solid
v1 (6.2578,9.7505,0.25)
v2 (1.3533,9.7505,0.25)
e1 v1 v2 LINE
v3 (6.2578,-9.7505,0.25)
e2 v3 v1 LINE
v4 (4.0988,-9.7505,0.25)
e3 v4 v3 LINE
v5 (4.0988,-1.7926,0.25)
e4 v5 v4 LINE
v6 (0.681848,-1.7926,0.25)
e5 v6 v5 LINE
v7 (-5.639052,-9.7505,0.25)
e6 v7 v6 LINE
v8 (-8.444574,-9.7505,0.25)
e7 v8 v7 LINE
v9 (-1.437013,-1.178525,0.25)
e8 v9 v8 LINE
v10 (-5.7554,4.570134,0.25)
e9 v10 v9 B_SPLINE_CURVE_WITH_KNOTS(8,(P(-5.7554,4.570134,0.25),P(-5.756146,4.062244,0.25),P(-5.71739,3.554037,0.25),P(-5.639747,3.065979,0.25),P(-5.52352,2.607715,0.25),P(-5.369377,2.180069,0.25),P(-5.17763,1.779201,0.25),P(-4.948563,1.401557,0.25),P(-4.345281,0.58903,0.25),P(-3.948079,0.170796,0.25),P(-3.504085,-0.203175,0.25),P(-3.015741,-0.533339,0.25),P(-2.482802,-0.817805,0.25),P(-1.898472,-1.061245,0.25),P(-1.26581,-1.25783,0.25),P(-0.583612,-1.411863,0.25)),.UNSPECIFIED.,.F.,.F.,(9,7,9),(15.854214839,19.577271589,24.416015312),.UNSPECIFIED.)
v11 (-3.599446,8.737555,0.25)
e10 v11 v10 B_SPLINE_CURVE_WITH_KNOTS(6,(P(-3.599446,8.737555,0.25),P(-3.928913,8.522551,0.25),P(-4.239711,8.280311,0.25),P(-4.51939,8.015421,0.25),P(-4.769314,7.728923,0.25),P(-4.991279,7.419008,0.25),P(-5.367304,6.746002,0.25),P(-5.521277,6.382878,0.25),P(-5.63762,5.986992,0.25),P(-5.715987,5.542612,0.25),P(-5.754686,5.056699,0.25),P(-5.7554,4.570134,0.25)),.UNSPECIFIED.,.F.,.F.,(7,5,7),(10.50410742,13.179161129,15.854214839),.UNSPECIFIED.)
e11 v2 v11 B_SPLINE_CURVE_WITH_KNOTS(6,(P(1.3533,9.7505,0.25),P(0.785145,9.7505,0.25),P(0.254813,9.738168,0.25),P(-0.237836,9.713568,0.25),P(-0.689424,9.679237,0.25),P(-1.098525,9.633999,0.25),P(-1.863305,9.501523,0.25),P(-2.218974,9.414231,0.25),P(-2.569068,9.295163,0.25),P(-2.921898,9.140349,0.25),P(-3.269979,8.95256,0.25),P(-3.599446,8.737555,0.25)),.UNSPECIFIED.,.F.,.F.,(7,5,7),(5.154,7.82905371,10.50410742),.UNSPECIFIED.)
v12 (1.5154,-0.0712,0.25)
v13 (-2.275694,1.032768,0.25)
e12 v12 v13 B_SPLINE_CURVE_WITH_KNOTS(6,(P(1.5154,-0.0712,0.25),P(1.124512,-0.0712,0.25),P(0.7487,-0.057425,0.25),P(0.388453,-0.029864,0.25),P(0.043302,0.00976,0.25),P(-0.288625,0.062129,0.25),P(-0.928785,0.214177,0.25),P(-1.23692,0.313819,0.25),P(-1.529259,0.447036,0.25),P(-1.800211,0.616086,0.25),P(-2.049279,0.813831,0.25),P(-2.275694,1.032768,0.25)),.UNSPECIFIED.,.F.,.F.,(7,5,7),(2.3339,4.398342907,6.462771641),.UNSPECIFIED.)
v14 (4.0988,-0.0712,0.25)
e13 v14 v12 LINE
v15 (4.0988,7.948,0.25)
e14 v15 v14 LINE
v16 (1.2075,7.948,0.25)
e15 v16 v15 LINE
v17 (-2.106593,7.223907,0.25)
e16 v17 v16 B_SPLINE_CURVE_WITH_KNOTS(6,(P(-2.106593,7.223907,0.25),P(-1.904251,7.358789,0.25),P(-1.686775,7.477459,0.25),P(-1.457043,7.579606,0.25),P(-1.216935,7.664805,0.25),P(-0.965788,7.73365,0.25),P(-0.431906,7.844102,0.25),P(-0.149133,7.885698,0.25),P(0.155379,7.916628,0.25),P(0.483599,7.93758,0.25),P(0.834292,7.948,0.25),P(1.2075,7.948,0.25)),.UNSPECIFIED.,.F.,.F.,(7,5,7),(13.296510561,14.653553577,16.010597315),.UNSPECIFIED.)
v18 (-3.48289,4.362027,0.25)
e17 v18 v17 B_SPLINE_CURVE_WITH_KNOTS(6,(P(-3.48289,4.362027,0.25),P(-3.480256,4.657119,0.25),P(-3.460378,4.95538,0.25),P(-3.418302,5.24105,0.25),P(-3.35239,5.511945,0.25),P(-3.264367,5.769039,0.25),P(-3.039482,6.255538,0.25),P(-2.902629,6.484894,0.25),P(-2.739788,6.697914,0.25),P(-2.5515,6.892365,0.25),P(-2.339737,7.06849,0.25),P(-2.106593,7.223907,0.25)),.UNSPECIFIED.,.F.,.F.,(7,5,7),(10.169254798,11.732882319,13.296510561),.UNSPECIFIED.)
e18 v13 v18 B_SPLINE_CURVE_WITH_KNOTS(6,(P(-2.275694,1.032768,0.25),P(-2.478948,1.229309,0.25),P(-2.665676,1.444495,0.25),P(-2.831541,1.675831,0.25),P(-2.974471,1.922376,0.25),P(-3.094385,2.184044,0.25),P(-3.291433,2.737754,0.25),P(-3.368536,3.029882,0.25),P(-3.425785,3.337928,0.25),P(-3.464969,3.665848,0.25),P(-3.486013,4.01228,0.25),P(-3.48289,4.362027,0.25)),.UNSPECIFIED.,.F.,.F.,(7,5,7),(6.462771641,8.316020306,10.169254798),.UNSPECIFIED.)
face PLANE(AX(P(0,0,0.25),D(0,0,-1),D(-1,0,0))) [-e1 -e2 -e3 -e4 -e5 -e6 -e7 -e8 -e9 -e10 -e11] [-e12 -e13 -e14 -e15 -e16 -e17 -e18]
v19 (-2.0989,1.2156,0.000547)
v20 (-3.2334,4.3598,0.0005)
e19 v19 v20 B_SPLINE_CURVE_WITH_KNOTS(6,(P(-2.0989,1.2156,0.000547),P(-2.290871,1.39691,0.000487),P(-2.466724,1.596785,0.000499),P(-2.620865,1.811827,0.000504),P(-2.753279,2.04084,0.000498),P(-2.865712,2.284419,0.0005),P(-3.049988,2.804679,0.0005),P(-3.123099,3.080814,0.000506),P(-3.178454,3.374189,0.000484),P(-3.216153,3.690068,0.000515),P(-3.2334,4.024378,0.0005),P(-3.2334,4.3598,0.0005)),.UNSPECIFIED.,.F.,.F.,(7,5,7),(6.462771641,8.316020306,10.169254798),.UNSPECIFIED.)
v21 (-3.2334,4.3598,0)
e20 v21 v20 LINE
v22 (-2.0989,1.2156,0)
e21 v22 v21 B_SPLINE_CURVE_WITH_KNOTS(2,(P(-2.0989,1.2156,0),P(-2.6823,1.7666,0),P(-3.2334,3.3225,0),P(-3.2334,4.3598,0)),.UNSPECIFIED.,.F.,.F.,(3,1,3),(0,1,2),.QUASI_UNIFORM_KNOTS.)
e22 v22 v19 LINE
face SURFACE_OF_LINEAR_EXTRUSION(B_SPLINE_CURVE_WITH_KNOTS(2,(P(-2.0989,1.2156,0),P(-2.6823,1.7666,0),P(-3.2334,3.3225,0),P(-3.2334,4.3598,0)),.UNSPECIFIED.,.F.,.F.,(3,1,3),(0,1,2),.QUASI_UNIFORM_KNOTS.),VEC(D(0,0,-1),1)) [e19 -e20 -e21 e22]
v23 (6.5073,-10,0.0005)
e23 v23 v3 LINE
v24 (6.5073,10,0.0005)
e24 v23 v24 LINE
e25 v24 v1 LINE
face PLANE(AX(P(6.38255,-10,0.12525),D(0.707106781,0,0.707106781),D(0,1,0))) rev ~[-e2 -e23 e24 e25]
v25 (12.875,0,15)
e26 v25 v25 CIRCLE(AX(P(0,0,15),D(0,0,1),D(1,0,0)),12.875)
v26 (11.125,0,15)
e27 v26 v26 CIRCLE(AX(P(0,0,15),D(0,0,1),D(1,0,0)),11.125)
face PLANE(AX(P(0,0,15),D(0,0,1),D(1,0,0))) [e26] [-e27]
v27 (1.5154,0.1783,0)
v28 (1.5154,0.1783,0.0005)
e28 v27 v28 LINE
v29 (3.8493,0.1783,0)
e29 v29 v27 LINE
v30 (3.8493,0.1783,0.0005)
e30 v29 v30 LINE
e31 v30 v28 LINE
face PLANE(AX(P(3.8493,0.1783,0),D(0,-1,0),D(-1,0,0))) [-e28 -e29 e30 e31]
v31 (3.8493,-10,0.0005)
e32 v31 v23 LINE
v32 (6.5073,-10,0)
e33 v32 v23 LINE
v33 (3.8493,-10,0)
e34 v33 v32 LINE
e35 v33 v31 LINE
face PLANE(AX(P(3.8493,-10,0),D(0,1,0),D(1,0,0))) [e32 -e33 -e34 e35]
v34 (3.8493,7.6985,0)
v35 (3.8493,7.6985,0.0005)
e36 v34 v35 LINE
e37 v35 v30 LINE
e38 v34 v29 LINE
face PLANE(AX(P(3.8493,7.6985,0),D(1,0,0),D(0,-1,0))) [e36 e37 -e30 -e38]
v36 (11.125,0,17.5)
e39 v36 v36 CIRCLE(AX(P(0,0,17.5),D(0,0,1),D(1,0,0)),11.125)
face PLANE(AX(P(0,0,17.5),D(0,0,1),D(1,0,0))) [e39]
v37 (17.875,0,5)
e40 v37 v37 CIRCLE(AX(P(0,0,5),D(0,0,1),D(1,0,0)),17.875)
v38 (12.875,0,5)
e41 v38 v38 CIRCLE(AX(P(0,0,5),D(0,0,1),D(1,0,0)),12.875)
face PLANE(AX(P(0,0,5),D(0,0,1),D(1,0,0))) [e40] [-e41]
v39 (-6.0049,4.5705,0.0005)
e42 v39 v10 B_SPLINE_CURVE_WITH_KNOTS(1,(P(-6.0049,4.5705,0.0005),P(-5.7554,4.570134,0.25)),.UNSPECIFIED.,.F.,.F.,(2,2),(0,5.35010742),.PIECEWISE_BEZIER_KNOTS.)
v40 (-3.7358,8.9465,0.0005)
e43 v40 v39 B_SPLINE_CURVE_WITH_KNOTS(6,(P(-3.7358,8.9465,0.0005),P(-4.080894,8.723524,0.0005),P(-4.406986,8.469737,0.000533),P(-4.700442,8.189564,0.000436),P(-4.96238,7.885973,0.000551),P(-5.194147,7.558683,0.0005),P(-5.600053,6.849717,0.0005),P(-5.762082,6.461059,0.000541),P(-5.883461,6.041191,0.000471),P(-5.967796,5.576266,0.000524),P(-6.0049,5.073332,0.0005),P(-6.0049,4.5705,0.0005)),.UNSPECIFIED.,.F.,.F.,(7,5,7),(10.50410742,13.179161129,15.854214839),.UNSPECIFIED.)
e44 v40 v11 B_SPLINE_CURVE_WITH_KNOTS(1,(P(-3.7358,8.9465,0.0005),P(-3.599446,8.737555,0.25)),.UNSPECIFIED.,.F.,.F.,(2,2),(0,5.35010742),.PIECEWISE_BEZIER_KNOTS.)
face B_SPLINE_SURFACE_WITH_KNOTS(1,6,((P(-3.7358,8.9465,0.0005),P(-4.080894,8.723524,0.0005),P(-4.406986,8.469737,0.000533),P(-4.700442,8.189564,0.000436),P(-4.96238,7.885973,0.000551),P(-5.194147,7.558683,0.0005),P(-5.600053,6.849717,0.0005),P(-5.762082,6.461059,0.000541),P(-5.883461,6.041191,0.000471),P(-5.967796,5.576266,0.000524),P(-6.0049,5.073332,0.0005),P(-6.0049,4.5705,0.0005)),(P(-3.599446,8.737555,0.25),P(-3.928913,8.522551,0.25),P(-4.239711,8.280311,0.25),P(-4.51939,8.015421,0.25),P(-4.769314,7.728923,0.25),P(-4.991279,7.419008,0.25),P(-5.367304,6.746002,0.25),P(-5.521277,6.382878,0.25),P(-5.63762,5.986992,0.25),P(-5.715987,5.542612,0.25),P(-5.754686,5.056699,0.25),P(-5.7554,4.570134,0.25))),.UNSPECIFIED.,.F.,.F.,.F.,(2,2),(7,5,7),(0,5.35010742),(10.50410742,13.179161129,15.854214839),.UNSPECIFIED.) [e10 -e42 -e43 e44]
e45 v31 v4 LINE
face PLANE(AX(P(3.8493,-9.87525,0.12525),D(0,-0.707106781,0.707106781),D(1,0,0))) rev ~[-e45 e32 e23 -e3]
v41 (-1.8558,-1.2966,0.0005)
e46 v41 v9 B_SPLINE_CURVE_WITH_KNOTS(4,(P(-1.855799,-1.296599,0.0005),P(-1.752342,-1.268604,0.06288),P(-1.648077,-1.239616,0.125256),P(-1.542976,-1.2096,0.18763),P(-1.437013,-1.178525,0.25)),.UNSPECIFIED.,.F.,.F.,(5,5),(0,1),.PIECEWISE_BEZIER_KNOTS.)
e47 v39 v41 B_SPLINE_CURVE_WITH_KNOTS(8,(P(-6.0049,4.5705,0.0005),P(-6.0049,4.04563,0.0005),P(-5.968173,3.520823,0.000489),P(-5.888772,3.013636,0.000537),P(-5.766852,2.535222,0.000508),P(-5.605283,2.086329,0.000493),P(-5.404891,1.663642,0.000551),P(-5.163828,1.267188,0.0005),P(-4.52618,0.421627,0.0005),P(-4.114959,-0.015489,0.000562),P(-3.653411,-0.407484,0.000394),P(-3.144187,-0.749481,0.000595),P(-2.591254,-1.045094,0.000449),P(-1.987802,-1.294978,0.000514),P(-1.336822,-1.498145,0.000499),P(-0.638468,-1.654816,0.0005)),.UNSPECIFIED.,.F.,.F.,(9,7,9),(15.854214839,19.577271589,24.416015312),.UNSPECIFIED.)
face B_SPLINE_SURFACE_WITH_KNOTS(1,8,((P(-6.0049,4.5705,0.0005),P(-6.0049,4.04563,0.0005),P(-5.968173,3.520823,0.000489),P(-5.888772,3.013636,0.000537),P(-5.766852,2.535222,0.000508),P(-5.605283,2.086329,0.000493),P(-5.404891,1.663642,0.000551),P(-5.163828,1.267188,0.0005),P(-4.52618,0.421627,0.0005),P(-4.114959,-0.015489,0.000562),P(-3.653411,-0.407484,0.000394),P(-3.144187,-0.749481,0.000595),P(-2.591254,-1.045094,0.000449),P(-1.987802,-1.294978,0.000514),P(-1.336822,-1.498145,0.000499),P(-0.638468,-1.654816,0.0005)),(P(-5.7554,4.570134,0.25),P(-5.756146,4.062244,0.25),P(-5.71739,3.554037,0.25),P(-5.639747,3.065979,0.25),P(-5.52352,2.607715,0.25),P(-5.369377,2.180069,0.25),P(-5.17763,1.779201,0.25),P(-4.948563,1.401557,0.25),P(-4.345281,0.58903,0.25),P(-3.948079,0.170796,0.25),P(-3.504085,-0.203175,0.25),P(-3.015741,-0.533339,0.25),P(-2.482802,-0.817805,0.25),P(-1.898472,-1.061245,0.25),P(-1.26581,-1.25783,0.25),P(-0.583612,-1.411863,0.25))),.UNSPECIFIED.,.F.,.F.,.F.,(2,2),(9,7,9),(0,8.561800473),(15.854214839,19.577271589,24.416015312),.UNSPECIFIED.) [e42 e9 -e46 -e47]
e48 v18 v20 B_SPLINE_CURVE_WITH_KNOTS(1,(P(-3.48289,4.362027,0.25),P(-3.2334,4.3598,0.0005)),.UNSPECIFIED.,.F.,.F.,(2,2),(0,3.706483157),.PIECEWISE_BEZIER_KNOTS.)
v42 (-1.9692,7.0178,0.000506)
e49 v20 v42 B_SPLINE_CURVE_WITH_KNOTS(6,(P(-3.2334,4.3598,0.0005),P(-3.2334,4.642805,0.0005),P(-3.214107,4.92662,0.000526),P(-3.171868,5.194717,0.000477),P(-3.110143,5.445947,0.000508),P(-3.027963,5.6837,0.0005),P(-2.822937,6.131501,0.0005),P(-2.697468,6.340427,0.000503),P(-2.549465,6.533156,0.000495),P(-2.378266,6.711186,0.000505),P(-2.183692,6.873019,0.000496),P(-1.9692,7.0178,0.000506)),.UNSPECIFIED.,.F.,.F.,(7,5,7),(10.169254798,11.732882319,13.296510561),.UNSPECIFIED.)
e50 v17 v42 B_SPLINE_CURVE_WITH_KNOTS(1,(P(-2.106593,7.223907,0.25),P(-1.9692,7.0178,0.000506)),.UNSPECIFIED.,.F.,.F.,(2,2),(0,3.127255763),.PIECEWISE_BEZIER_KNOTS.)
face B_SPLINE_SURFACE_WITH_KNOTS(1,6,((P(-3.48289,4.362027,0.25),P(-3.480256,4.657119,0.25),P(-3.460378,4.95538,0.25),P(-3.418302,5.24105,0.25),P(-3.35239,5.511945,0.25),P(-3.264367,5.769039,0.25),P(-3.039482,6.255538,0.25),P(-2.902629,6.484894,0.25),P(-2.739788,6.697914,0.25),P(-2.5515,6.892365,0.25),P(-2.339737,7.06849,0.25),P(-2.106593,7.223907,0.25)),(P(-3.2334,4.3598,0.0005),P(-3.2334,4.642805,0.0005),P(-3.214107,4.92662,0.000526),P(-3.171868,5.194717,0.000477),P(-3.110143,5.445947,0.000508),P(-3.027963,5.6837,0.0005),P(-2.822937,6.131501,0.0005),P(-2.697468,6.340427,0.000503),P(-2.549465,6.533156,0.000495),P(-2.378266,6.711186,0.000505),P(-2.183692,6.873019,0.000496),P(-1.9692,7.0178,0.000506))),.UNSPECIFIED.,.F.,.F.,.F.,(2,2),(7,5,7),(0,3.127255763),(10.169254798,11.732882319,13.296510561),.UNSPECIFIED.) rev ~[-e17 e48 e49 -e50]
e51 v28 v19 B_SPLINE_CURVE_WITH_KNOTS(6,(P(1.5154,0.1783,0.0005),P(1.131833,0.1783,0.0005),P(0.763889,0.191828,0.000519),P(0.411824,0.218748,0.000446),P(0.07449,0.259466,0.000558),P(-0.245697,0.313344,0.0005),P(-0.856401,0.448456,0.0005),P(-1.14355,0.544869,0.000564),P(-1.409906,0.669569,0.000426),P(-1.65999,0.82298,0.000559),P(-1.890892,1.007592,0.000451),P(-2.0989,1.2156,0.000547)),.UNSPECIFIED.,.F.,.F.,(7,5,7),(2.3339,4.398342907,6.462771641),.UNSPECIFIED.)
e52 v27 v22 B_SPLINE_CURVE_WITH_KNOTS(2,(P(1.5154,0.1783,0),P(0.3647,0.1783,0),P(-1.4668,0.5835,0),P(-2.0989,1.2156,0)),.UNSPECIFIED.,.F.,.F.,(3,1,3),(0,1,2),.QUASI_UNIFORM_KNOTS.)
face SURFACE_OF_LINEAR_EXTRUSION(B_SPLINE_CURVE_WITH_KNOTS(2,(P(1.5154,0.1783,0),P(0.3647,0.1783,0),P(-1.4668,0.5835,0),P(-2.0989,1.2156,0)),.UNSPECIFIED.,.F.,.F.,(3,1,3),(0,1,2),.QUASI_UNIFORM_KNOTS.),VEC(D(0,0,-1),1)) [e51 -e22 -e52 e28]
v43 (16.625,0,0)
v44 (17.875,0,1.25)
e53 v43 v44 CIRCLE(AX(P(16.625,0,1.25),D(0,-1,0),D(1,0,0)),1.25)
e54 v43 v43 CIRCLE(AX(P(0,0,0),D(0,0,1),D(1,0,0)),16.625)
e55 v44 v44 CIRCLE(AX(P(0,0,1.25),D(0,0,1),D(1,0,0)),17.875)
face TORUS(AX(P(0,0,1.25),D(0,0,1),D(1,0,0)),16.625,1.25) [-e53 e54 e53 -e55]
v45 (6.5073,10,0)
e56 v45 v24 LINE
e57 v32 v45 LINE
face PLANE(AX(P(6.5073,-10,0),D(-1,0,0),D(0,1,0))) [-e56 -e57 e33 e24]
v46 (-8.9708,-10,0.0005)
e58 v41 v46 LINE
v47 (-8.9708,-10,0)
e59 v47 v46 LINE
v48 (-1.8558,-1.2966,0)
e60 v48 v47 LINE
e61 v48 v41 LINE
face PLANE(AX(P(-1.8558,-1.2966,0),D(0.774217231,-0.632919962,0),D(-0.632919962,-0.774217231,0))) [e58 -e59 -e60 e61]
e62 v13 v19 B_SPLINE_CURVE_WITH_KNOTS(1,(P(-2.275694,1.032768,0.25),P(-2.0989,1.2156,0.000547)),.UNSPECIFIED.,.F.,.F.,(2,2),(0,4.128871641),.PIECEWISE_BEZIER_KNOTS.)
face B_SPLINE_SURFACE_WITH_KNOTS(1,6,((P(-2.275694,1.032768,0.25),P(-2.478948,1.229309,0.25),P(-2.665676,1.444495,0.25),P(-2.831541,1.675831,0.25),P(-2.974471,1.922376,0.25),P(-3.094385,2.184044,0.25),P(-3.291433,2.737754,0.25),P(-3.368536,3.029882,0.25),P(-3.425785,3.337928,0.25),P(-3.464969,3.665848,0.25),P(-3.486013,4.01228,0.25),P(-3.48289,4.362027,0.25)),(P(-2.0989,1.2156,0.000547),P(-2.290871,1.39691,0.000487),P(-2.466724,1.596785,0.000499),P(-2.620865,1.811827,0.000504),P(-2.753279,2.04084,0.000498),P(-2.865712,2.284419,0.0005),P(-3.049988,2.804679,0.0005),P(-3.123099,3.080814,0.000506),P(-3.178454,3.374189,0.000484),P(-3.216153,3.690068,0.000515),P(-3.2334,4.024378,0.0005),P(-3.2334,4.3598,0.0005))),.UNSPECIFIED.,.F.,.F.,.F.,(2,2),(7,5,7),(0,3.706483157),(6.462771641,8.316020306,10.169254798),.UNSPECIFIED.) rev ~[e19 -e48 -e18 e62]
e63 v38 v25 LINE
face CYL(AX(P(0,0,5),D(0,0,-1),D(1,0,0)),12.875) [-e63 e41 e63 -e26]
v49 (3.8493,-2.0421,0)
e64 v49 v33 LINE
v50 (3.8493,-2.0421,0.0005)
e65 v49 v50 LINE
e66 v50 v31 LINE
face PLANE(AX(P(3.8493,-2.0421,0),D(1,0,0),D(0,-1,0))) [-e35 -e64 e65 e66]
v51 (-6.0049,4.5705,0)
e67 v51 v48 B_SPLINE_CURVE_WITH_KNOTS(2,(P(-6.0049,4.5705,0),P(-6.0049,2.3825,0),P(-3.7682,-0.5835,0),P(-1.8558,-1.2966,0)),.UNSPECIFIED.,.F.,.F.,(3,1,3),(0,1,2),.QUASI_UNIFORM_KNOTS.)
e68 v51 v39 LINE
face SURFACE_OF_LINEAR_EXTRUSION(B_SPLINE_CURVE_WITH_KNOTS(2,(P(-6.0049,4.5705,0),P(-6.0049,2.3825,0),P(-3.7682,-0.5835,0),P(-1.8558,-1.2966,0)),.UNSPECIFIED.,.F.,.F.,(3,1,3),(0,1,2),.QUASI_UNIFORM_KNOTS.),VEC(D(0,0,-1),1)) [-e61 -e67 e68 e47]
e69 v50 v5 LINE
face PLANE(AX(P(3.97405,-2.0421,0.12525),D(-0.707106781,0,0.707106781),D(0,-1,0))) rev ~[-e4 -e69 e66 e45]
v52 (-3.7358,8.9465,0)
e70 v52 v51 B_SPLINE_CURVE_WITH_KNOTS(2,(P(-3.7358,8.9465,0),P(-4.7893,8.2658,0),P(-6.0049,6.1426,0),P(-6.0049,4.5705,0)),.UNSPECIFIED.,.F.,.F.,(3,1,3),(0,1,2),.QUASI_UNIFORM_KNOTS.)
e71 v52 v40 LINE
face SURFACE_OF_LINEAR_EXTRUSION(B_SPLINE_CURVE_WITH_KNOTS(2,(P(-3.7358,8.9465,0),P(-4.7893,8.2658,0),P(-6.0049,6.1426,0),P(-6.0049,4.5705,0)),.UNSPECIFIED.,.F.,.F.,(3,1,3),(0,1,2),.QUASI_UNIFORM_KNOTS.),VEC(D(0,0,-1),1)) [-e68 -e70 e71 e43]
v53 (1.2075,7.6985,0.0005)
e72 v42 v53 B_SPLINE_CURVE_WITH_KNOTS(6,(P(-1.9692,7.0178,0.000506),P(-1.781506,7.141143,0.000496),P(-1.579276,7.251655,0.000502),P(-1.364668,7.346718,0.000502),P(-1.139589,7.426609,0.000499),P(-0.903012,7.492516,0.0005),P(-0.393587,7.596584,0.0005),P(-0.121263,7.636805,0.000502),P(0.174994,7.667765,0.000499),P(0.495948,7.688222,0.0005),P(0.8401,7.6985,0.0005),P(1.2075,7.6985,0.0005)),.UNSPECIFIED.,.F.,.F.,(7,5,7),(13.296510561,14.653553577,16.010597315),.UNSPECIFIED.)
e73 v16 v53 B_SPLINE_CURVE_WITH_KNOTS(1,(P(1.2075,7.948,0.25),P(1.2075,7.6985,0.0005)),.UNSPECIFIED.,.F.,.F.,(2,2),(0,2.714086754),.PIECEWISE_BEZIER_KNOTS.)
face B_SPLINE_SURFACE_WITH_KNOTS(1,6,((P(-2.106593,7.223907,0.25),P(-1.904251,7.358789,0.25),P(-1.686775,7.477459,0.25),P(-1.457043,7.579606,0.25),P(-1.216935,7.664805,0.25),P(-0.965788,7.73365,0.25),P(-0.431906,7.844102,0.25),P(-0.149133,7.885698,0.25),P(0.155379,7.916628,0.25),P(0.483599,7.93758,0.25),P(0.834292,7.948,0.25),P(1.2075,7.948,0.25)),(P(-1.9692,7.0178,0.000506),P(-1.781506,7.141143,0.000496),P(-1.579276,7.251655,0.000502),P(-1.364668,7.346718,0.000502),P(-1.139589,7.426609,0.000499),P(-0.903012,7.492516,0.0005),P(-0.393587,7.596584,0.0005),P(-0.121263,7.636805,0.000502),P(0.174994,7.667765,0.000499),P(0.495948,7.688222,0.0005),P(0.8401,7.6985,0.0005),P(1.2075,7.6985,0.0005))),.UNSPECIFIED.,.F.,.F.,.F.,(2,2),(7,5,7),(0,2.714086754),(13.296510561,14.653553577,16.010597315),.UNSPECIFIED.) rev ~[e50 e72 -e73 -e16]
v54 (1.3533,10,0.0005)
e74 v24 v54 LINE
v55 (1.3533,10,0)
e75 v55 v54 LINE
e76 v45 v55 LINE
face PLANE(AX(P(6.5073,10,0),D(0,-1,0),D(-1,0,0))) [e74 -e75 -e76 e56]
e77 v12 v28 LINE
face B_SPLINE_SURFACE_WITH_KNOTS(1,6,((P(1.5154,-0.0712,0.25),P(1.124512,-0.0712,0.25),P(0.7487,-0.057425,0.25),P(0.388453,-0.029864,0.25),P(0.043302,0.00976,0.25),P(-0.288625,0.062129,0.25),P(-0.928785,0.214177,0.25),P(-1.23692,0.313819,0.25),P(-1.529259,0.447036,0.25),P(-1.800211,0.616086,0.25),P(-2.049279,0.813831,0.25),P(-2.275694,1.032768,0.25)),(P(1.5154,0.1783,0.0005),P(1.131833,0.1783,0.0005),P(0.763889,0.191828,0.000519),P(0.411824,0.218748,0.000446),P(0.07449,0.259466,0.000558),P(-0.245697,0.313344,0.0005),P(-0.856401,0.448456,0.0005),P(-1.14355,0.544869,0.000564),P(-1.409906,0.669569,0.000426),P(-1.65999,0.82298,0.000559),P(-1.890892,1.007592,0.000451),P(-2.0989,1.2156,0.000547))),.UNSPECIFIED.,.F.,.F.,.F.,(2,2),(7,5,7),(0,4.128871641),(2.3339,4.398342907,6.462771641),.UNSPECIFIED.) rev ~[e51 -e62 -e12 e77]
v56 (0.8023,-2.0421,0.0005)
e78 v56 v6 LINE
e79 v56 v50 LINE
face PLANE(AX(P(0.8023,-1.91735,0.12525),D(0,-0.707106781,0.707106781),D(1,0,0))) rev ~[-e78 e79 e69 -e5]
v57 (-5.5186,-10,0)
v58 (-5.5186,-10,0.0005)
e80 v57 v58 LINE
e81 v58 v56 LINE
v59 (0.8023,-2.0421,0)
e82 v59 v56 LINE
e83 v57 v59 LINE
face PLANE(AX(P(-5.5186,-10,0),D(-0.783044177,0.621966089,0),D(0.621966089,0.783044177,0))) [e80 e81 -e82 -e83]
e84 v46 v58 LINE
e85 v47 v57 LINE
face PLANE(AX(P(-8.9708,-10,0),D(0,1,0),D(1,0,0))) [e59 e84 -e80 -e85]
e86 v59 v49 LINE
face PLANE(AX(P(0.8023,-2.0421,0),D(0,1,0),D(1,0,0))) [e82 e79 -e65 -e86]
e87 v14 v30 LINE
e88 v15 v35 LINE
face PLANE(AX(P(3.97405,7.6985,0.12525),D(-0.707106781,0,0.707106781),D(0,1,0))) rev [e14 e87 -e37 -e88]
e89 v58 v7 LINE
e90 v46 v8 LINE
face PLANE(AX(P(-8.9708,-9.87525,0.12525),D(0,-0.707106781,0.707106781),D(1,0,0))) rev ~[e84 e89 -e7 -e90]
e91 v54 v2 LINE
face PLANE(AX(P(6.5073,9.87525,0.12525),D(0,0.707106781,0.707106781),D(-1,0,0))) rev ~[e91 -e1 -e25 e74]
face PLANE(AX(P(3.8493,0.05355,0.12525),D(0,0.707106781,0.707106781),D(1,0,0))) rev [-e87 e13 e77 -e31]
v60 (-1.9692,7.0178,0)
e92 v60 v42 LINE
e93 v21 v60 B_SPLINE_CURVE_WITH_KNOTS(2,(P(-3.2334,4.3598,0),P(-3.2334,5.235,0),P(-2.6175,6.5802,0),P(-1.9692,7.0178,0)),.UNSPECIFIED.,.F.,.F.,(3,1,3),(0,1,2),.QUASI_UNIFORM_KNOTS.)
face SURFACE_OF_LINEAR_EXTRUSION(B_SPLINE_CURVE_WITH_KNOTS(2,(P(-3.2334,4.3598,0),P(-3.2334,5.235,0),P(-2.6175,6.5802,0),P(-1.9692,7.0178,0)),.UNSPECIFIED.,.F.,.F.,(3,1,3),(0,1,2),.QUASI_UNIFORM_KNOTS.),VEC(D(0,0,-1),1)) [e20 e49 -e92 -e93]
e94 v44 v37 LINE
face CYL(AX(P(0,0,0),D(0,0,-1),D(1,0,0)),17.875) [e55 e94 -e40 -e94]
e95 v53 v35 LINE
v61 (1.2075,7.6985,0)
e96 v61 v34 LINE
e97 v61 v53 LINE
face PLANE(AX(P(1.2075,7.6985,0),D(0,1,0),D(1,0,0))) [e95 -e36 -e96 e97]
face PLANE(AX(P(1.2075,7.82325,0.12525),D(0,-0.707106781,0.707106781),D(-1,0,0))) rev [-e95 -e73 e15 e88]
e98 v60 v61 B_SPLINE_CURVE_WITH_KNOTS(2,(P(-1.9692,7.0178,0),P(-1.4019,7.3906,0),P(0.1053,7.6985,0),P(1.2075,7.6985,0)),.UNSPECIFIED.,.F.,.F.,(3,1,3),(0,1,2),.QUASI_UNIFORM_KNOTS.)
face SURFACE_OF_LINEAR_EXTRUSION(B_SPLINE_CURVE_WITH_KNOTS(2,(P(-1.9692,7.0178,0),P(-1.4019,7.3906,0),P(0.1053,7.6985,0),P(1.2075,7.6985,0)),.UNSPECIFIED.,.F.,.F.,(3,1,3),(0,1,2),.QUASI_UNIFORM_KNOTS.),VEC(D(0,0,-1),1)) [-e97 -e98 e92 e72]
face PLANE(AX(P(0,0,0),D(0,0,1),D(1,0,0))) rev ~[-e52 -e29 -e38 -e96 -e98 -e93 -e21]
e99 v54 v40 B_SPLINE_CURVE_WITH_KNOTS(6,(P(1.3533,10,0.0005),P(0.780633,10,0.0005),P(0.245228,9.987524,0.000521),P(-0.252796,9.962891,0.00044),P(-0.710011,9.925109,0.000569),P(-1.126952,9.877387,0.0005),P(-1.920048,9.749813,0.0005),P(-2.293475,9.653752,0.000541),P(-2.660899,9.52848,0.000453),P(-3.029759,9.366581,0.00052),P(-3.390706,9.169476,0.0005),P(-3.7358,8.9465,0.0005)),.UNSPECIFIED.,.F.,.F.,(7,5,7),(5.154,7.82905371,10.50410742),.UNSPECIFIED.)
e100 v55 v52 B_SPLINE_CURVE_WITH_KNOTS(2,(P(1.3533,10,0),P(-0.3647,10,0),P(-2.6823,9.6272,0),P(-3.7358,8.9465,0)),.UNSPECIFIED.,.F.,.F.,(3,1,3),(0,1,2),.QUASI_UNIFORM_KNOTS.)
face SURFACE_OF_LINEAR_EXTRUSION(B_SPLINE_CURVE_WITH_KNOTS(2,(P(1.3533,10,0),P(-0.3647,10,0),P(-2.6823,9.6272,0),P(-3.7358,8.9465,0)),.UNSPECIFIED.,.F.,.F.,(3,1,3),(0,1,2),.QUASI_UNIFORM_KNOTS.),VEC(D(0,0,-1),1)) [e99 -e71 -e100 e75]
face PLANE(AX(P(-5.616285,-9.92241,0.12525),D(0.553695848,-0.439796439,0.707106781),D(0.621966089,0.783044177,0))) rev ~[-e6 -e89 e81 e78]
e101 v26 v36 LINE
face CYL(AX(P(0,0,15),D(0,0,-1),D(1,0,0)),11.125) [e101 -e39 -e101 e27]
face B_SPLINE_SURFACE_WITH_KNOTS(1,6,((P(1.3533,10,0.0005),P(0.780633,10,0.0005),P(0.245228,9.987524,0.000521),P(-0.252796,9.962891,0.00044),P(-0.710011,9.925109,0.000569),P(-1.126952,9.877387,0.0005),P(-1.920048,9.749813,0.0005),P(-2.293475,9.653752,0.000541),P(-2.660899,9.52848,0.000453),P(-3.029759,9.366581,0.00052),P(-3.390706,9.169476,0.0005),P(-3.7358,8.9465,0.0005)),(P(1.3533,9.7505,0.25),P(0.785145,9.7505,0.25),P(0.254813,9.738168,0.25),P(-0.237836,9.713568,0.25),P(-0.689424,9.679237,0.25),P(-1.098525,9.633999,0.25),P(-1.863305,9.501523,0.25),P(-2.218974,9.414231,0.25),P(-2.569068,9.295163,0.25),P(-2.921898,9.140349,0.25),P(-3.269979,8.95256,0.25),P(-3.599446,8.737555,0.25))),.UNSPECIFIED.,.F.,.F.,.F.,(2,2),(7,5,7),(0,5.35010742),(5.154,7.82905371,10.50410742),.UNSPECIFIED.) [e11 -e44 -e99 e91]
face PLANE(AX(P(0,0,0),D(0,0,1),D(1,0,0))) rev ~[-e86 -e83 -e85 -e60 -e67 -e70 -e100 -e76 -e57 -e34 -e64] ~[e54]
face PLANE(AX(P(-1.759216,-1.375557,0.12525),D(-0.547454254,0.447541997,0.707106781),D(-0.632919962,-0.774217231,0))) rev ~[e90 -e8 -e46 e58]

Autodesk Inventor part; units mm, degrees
ref_plane "YZ Plane" through (0, 0, 0) normal (1, 0, 0) x (0, 1, 0)
ref_plane "XZ Plane" through (0, 0, 0) normal (0, 1, 0) x (-1, 0, 0)
ref_plane "XY Plane" through (0, 0, 0) normal (0, 0, 1) x (1, 0, 0)
sketch "Sketch1" plane through (0, 0, 0) normal (0, 0, 1) x (1, 0, 0)
  circle A0 centre (0, 0) radius 11.125
  circle A1 centre (0, 0) radius 12.875
  circle A2 centre (0, 0) radius 17.875
  dimension "d0" = 22.25
  dimension "d1" = 25.75
  dimension "d2" = 5
extrude "Extrusion1" add sketch "Sketch1" along normal blind 5 contours A0 | A1 | A2
extrude "Extrusion2" add sketch "Sketch1" along normal blind 10 from surface at 5 contours A0 | A1
extrude "Extrusion3" add sketch "Sketch1" along normal blind 2.5 from surface at 15 contours A0
fillet "Fillet1" radius 1.25 1 edges at (-17.875, 0, 0)
sketch "Sketch2" plane through (0, 0, 0) normal (0, 0, -1) x (-1, 0, 0)
  line L0 (-12.5, -12.5) -> (12.5, -12.5)
  line L1 (12.5, -12.5) -> (12.5, 12.5)
  line L2 (12.5, 12.5) -> (-12.5, 12.5)
  line L3 (-12.5, 12.5) -> (-12.5, -12.5)
  line L4 (-12.5, -12.5) -> (12.5, 12.5) construction
  line L5 (12.5, -12.5) -> (-12.5, 12.5) construction
  line L6 (-12.5, 12.5) -> (12.5, 12.5) construction
  line L7 (12.5, 12.5) -> (12.5, -12.5) construction
  line L8 (12.5, -12.5) -> (-12.5, -12.5) construction
  line L9 (-12.5, -12.5) -> (-12.5, 12.5) construction
  line L10 (8.9708, -10) -> (5.5186, -10)
  line L11 (5.5186, -10) -> (-0.8023, -2.0421)
  line L12 (-0.8023, -2.0421) -> (-3.8493, -2.0421)
  line L13 (-3.8493, -2.0421) -> (-3.8493, -10)
  line L14 (-3.8493, -10) -> (-6.5073, -10)
  line L15 (-6.5073, -10) -> (-6.5073, 10)
  line L16 (-6.5073, 10) -> (-1.3533, 10)
  spline S0 degree 2 poles (-1.3533, 10) (0.3647, 10) (2.6823, 9.6272) (3.7358, 8.9465) knots 0 0 0 1 2 2 2
  spline S1 degree 2 poles (3.7358, 8.9465) (4.7893, 8.2658) (6.0049, 6.1426) (6.0049, 4.5705) knots 0 0 0 1 2 2 2
  spline S2 degree 2 poles (6.0049, 4.5705) (6.0049, 2.3825) (3.7682, -0.5835) (1.8558, -1.2966) knots 0 0 0 1 2 2 2
  line L17 (1.8558, -1.2966) -> (8.9708, -10)
  spline S3 degree 2 poles (3.2334, 4.3598) (3.2334, 5.235) (2.6175, 6.5802) (1.9692, 7.0178) knots 0 0 0 1 2 2 2
  spline S4 degree 2 poles (1.9692, 7.0178) (1.4019, 7.3906) (-0.1053, 7.6985) (-1.2075, 7.6985) knots 0 0 0 1 2 2 2
  line L18 (-1.2075, 7.6985) -> (-3.8493, 7.6985)
  line L19 (-3.8493, 7.6985) -> (-3.8493, 0.1783)
  line L20 (-3.8493, 0.1783) -> (-1.5154, 0.1783)
  spline S5 degree 2 poles (-1.5154, 0.1783) (-0.3647, 0.1783) (1.4668, 0.5835) (2.0989, 1.2156) knots 0 0 0 1 2 2 2
  spline S6 degree 2 poles (2.0989, 1.2156) (2.6823, 1.7666) (3.2334, 3.3225) (3.2334, 4.3598) knots 0 0 0 1 2 2 2
  point P0 (0, 0)
  dimension "d10" = 25
  dimension "d11" = 25
extrude "Extrusion4" cut sketch "Sketch2" against normal blind 0.25 contours L10 L11 L12 L13 L14 L15 L16 S0 S1 S2 L17
chamfer "Chamfer1" distance 0.25 angle 45 18 edges at (-7.2447, -10, 0.25) (-2.3582, -6.0211, 0.25) (2.3258, -2.0421, 0.25) (3.8493, -6.0211, 0.25) (5.1783, -10, 0.25) (6.5073, 0, 0.25) (3.9303, 10, 0.25) (-1.5235, 9.8136, 0.25) (-5.3971, 7.2042, 0.25) (-4.8865, 0.8995, 0.25) (-5.4133, -5.6483, 0.25) (-2.9579, 2.5446, 0.25) (-2.9254, 5.9076, 0.25) (-0.6483, 7.5446, 0.25) (2.5284, 7.6985, 0.25) (3.8493, 3.9384, 0.25) (2.6823, 0.1783, 0.25) (-0.5511, 0.3809, 0.25)
properties part number "SM1 Removal Tool"
